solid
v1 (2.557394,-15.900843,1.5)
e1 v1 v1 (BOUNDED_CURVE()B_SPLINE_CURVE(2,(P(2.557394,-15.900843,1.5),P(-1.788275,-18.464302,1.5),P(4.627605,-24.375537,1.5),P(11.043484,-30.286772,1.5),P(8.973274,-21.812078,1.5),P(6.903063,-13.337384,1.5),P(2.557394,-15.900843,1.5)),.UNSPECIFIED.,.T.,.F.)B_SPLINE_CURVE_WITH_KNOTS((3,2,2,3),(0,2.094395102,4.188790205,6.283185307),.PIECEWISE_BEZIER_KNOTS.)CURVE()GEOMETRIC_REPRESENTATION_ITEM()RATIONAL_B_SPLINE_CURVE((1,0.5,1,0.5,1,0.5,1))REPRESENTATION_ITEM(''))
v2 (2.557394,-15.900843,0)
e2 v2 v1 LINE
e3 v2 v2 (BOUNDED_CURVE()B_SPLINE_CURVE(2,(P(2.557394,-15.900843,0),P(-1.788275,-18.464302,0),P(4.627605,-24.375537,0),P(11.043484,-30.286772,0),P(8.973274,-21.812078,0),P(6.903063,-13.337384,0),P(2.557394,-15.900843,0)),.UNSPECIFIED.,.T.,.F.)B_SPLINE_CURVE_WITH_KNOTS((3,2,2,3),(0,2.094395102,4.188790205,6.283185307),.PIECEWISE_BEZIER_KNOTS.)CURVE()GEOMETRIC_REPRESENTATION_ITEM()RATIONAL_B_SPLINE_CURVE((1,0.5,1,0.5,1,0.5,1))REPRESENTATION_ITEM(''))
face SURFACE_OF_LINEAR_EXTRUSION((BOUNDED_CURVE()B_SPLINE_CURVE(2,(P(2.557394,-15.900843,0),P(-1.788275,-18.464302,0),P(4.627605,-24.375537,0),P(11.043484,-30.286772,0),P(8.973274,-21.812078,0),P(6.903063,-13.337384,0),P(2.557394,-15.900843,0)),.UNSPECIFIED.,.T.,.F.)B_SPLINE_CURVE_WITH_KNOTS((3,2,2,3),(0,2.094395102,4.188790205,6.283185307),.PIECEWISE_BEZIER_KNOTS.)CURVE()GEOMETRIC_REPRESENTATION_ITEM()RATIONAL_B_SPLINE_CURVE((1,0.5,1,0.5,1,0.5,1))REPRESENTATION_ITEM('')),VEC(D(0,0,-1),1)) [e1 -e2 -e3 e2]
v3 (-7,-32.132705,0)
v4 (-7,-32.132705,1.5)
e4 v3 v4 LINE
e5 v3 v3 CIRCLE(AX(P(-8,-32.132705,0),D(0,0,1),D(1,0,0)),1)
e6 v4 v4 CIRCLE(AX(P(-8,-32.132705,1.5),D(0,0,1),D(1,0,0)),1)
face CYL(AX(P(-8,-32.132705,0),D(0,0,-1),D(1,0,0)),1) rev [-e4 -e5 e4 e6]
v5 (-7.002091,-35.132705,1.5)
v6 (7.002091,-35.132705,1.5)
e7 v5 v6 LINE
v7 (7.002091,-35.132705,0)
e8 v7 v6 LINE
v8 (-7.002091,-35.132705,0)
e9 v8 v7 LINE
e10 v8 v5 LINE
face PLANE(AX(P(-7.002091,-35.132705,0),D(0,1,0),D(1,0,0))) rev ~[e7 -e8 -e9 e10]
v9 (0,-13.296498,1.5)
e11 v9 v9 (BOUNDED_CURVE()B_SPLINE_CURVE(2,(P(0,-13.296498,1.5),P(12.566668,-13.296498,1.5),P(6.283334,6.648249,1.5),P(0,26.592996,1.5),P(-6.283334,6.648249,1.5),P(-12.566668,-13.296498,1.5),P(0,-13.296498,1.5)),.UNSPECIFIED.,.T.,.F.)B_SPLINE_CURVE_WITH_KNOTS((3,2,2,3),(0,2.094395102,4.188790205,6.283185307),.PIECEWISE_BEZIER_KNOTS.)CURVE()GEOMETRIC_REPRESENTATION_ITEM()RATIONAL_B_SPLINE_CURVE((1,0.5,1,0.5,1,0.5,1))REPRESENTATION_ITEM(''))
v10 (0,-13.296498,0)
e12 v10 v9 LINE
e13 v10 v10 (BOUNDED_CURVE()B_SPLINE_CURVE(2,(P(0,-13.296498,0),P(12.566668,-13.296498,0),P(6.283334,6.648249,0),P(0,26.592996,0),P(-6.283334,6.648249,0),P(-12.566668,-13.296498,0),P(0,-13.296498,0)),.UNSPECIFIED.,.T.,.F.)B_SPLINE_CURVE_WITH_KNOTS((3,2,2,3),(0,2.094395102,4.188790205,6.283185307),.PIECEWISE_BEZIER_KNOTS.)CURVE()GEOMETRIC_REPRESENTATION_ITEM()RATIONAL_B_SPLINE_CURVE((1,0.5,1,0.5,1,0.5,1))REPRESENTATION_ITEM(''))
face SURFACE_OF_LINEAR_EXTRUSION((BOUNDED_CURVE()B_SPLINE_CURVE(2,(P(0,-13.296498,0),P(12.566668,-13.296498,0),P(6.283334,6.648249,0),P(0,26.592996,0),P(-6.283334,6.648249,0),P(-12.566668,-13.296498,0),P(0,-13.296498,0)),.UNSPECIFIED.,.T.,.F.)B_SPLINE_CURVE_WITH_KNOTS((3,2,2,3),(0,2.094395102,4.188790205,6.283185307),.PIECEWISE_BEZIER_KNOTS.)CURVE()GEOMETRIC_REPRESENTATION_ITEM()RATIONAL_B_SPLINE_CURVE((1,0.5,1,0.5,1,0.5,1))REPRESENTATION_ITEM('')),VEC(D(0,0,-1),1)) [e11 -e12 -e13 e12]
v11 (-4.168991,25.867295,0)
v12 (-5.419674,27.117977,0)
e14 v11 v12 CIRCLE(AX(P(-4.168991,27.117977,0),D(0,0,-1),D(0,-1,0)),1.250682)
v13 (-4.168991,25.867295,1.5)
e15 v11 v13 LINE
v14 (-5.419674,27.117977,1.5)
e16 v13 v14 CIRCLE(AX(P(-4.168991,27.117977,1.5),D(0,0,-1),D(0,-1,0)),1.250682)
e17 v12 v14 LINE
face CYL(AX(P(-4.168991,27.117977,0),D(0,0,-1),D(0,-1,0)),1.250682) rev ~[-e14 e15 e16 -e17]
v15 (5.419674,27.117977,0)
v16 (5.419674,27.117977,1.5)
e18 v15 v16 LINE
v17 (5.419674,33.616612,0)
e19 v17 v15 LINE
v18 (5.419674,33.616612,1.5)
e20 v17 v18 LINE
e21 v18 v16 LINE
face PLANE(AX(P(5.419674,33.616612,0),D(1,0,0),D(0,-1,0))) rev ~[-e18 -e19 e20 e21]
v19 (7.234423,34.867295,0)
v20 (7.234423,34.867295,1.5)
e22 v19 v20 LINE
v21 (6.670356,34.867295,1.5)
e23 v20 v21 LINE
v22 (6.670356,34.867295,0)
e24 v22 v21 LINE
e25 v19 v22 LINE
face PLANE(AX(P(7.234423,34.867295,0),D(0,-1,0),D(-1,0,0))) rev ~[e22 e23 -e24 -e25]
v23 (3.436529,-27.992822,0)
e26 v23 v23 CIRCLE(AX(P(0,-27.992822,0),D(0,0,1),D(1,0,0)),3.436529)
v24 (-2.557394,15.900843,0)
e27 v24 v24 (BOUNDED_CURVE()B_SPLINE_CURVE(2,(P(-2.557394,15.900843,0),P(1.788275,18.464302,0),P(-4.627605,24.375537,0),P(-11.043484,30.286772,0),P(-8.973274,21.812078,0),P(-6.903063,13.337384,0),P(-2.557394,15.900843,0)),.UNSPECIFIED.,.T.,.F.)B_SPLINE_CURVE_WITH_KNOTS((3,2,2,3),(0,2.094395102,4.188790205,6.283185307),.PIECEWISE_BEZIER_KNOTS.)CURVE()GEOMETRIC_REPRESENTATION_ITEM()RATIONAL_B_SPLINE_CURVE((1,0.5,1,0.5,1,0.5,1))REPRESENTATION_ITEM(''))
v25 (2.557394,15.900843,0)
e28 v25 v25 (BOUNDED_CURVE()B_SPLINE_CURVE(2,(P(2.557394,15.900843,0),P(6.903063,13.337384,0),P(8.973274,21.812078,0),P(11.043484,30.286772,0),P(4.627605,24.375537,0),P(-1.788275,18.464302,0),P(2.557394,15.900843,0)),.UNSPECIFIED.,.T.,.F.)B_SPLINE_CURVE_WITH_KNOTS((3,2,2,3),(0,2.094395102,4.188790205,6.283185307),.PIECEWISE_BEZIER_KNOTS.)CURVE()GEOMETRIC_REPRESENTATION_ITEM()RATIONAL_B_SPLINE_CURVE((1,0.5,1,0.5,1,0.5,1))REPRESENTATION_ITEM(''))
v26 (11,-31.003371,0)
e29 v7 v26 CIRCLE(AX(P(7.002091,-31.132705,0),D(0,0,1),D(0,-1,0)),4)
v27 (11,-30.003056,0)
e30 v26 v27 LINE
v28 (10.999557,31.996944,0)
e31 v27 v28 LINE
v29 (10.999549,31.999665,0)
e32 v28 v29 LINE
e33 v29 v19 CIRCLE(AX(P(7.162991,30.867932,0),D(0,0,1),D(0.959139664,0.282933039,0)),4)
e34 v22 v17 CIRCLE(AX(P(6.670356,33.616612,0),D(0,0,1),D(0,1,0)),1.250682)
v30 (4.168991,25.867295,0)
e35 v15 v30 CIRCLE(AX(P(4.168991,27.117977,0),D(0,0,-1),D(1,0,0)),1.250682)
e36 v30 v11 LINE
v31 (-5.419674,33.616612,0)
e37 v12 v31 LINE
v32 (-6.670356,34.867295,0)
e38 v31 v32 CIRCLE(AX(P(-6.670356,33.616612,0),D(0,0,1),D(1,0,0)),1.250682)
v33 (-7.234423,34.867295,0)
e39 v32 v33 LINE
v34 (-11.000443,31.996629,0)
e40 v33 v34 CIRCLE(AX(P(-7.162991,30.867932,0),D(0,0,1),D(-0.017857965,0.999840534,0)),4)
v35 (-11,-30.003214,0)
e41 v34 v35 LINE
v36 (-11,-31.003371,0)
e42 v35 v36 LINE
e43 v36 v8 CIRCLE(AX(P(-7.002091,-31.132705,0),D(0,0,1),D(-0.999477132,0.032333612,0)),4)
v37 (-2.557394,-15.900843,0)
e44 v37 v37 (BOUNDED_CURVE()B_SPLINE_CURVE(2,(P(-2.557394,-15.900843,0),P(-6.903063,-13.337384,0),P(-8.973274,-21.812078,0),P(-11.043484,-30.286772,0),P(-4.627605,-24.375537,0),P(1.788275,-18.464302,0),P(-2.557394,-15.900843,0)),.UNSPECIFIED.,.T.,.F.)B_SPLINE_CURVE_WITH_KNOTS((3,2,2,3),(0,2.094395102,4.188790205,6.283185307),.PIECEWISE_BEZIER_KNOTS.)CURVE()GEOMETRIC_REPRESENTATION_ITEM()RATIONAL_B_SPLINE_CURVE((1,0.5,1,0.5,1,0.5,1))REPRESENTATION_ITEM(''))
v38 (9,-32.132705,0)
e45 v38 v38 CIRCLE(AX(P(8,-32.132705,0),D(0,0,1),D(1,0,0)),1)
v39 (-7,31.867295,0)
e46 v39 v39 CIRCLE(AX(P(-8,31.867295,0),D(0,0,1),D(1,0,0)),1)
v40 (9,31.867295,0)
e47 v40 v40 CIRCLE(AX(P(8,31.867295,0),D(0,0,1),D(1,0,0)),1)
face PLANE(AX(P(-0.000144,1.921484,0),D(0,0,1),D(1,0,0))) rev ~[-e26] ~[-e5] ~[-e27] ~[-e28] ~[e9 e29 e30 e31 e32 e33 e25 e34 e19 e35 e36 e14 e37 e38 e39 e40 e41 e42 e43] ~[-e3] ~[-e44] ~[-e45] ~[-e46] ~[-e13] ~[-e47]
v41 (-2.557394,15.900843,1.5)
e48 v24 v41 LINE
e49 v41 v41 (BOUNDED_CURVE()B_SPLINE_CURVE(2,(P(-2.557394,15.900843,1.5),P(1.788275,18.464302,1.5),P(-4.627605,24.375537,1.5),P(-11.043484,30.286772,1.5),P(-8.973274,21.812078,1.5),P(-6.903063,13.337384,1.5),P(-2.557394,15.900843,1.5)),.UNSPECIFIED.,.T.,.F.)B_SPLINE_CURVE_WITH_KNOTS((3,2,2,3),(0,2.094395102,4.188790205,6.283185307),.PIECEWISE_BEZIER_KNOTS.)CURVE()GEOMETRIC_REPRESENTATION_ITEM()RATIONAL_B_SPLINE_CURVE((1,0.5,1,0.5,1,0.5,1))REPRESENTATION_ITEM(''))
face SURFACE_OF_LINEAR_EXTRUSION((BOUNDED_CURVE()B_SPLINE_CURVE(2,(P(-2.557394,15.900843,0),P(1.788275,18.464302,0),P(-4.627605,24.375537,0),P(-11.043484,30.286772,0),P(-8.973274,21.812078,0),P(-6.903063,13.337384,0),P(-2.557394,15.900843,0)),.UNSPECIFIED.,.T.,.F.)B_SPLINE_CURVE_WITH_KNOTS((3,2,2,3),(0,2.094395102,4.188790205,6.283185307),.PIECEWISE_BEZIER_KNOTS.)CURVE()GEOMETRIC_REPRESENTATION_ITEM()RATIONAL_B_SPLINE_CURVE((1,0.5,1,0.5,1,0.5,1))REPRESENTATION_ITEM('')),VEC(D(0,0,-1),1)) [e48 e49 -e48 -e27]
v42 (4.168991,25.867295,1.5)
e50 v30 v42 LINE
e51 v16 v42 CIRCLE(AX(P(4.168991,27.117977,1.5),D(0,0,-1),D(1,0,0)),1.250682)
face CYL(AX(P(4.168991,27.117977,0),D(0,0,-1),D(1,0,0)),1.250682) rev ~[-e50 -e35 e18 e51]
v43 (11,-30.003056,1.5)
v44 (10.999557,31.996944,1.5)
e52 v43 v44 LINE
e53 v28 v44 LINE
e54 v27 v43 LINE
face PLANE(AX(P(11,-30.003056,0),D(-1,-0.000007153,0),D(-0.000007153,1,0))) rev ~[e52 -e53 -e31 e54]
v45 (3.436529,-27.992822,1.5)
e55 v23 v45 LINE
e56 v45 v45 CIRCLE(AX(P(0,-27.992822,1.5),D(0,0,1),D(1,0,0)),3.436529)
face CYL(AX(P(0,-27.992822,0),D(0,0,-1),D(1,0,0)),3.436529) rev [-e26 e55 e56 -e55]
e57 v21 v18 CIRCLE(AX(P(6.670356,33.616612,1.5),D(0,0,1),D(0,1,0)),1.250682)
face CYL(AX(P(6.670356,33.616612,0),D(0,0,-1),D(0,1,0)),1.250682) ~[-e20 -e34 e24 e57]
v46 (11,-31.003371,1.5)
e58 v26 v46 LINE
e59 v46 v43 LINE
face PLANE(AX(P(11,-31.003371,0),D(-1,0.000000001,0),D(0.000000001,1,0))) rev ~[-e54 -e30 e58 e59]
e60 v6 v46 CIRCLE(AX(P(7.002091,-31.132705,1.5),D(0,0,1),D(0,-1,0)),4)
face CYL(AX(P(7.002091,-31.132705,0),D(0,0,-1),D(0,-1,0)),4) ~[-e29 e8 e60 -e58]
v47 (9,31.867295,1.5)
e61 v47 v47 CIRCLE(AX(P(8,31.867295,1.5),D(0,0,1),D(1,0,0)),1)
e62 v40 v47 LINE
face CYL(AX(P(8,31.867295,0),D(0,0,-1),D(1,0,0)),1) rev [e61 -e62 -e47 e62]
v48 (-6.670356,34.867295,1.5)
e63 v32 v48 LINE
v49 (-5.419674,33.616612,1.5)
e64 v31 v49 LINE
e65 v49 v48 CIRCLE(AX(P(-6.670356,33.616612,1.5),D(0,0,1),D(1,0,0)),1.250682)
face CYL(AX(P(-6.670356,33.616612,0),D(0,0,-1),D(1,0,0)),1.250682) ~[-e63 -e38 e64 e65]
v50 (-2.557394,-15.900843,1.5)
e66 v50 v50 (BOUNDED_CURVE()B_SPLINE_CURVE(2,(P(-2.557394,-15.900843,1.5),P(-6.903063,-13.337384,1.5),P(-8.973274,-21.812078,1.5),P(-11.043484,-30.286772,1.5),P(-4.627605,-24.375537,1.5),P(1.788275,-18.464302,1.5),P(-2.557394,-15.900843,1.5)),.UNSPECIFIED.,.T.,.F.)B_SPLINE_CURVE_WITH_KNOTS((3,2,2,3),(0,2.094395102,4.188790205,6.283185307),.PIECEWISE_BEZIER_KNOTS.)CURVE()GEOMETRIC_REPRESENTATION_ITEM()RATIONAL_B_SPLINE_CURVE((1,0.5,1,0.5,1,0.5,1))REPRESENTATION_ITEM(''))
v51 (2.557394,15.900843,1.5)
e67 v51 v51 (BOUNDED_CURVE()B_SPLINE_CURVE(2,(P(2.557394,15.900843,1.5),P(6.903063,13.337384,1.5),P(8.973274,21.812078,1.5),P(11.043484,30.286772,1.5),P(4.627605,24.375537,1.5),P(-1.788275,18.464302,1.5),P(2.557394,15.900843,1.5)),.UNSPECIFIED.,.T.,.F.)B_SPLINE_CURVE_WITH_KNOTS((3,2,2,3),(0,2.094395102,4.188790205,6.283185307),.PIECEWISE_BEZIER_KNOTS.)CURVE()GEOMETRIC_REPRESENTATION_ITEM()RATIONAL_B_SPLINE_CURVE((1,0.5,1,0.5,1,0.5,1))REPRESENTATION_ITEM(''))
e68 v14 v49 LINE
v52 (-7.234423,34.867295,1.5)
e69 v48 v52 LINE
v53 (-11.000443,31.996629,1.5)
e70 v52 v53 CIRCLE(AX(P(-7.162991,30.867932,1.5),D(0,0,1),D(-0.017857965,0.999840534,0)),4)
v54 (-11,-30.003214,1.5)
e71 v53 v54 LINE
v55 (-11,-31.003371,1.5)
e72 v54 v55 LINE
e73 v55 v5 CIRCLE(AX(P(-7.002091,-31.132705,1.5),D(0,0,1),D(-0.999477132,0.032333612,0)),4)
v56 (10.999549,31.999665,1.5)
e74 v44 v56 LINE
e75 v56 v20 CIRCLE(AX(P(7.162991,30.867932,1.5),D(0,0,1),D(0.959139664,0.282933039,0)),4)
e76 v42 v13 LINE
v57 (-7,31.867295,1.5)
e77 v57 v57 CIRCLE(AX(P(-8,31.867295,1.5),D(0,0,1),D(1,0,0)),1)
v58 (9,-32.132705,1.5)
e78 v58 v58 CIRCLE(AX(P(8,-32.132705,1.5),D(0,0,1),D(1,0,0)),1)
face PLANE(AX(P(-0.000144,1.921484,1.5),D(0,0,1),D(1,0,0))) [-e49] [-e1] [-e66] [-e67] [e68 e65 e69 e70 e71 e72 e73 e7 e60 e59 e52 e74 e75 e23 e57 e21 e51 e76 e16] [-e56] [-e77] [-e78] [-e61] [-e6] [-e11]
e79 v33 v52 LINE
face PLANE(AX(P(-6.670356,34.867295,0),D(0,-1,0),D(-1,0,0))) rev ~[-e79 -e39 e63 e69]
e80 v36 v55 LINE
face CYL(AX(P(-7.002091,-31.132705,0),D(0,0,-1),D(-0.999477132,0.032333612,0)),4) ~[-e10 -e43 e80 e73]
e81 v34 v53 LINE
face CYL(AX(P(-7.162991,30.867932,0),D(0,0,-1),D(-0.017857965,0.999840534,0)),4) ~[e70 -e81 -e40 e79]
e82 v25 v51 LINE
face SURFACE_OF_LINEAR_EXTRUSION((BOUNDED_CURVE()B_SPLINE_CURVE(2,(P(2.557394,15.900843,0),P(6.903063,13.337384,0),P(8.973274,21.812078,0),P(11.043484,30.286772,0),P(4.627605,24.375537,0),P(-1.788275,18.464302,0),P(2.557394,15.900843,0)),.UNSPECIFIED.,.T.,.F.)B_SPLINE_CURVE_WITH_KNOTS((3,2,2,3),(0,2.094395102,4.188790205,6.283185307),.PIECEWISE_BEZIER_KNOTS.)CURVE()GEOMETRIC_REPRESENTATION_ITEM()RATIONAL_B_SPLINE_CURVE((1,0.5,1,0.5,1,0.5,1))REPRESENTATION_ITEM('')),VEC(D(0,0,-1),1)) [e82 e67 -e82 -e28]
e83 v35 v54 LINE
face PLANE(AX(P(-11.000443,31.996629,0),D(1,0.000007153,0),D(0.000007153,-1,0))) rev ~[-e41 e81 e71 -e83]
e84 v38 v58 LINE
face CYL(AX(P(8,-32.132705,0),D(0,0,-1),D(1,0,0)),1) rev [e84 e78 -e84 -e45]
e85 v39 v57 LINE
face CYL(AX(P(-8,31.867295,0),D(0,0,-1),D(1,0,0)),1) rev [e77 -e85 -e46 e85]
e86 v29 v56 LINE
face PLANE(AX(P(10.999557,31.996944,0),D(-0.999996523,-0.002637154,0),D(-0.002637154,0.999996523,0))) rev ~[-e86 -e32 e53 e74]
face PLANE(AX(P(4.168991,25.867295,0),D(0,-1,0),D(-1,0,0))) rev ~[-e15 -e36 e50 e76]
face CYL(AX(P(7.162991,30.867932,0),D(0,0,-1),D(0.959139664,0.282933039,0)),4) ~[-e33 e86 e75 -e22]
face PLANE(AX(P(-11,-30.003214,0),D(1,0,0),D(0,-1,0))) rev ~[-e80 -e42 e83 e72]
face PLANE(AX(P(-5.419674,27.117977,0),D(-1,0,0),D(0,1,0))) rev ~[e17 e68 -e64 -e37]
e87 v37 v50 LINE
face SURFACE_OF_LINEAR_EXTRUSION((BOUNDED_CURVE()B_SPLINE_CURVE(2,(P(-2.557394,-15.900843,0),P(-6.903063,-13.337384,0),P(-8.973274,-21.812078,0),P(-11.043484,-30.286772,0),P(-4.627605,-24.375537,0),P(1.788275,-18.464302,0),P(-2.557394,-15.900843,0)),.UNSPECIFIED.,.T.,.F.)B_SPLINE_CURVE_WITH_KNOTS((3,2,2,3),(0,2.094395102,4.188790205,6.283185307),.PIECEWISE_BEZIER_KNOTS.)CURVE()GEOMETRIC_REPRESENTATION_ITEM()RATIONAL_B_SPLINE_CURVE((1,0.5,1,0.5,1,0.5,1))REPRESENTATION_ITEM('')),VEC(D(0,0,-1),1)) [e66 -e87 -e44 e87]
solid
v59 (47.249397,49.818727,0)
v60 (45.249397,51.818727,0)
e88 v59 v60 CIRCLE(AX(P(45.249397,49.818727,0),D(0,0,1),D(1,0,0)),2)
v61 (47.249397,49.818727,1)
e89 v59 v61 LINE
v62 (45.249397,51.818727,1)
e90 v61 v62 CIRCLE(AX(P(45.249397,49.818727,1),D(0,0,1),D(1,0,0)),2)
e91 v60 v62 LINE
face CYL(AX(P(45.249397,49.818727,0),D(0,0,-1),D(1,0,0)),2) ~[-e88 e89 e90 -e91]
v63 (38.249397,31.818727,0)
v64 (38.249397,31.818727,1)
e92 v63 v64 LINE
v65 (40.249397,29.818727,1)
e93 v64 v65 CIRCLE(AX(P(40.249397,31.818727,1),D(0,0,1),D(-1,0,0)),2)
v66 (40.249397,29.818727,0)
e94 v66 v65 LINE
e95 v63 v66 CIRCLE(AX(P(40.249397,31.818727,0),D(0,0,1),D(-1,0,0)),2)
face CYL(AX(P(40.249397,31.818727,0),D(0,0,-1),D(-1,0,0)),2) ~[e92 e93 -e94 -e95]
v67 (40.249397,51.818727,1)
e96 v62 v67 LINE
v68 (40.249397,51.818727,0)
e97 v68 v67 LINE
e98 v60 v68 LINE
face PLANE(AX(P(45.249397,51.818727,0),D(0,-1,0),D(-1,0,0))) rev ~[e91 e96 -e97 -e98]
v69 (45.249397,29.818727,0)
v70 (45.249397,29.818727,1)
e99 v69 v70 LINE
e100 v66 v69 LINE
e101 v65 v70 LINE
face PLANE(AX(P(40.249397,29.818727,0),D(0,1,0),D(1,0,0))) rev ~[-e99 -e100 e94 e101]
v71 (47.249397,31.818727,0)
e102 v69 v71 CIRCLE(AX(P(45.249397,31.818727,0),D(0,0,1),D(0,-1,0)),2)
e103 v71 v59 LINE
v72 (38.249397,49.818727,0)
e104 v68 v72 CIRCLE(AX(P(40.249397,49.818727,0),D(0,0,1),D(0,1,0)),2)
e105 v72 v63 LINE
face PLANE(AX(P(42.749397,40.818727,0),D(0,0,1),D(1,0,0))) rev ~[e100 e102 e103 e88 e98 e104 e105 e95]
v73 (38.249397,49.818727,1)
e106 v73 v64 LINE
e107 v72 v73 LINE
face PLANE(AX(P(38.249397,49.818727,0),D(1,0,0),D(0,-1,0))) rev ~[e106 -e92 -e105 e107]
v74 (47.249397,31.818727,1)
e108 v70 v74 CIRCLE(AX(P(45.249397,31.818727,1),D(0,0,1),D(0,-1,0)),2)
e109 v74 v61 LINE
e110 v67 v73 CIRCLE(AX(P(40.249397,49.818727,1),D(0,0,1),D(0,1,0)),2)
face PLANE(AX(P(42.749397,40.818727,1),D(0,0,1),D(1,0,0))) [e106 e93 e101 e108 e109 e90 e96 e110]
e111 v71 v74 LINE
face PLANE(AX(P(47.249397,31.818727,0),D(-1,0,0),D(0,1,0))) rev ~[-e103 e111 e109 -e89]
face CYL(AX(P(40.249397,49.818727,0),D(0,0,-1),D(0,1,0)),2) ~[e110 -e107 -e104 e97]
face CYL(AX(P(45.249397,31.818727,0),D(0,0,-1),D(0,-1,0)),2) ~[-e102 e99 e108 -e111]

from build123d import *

# Parameters (mm, degrees)
F0_R     = 1
F0_R_2   = 3.4365293236
F1_DEPTH = 1.5
F3_DEPTH = 1


# Not quite as in the source:
# - ends of sketch curves that miss each other by under 0.0002 mm in the source are joined


with BuildPart() as f1:
    # F0 (on Top) → F1 (new body)
    with BuildSketch(Plane.XY):
        with BuildLine():
            Line((-6.6703559288, 34.8672945046), (-7.2344225406, 34.8672945046))
            ThreePointArc((-7.2344225406, 34.8672945046), (-9.5878669678, 34.0491231833), (-11.0004434851, 31.996628953))
            Line((-11.0004434851, 31.996628953), (-10.9999999994, -30.0032136791))
            Line((-10.9999999994, -30.0032136791), (-10.9999999994, -31.003371047))
            ThreePointArc((-10.9999999994, -31.003371047), (-9.8758814594, -33.9150302613), (-7.0020914712, -35.1327054954))
            Line((-7.0020914712, -35.1327054954), (6.8289959157, -35.1327054954))
            Line((6.8289959157, -35.1327054954), (7.0020914712, -35.1327054954))
            ThreePointArc((7.0020914712, -35.1327054954), (9.8758814594, -33.9150302613), (10.9999999994, -31.003371047))
            Line((10.9999999994, -31.003371047), (11, -30.0030563128))
            Line((11, -30.0030563128), (10.9995565132, 31.9969436856))
            Line((10.9995565132, 31.9969436856), (10.9995493379, 31.9996645259))
            ThreePointArc((10.9995493379, 31.9996645259), (9.5866084094, 34.0500821314), (7.2344225406, 34.8672945046))
            Line((7.2344225406, 34.8672945046), (6.6703559288, 34.8672945046))
            ThreePointArc((6.6703559288, 34.8672945046), (5.7859899934, 34.5009781401), (5.4196736289, 33.6166122047))
            Line((5.4196736289, 33.6166122047), (5.4196736289, 28.8547880611))
            Line((5.4196736289, 28.8547880611), (5.4196736289, 27.1179768046))
            ThreePointArc((5.4196736289, 27.1179768046), (5.0533572643, 26.2336108692), (4.1689913289, 25.8672945046))
            Line((4.1689913289, 25.8672945046), (-4.1689913289, 25.8672945046))
            ThreePointArc((-4.1689913289, 25.8672945046), (-5.0533572643, 26.2336108692), (-5.4196736289, 27.1179768046))
            Line((-5.4196736289, 27.1179768046), (-5.4196736289, 28.8547880611))
            Line((-5.4196736289, 28.8547880611), (-5.4196736289, 33.6166122047))
            ThreePointArc((-5.4196736289, 33.6166122047), (-5.7859899934, 34.5009781401), (-6.6703559288, 34.8672945046))
        make_face()
        with Locations((-7.9999999994, -32.1327054954)):
            Circle(F0_R, mode=Mode.SUBTRACT)
        with Locations((0, -27.9928222299)):
            Circle(F0_R_2, mode=Mode.SUBTRACT)
        with BuildLine():
            add(Edge.make_bspline(
                [(-2.5573940948, -15.9008428454), (-6.9030631327, -13.3373837718), (-8.9732737277, -21.8120776777), (-11.0434843227, -30.2867715836), (-4.6276046898, -24.3755367514), (1.7882749432, -18.4643019191), (-2.5573940948, -15.9008428454)],
                knots=[0, 0, 0, 2.0943951024, 2.0943951024, 4.1887902048, 4.1887902048, 6.2831853072, 6.2831853072, 6.2831853072], degree=2, weights=[1, 0.5, 1, 0.5, 1, 0.5, 1]))
        make_face(mode=Mode.SUBTRACT)
        with BuildLine():
            add(Edge.make_bspline(
                [(2.5573940948, -15.9008428454), (-1.7882749432, -18.4643019191), (4.6276046898, -24.3755367514), (11.0434843227, -30.2867715836), (8.9732737277, -21.8120776777), (6.9030631327, -13.3373837718), (2.5573940948, -15.9008428454)],
                knots=[0, 0, 0, 2.0943951024, 2.0943951024, 4.1887902048, 4.1887902048, 6.2831853072, 6.2831853072, 6.2831853072], degree=2, weights=[1, 0.5, 1, 0.5, 1, 0.5, 1]))
        make_face(mode=Mode.SUBTRACT)
        with Locations((8, -32.1327054954)):
            Circle(F0_R, mode=Mode.SUBTRACT)
        with BuildLine():
            add(Edge.make_bspline(
                [(0, -13.2964979857), (12.5666675431, -13.2964979857), (6.2833337715, 6.6482489929), (0, 26.5929959714), (-6.2833337715, 6.6482489929), (-12.5666675431, -13.2964979857), (0, -13.2964979857)],
                knots=[0, 0, 0, 2.0943951024, 2.0943951024, 4.1887902048, 4.1887902048, 6.2831853072, 6.2831853072, 6.2831853072], degree=2, weights=[1, 0.5, 1, 0.5, 1, 0.5, 1]))
        make_face(mode=Mode.SUBTRACT)
        with Locations((-8, 31.8672945046)):
            Circle(F0_R, mode=Mode.SUBTRACT)
        with BuildLine():
            add(Edge.make_bspline(
                [(-2.5573940948, 15.9008428454), (1.7882749432, 18.4643019191), (-4.6276046898, 24.3755367514), (-11.0434843227, 30.2867715836), (-8.9732737277, 21.8120776777), (-6.9030631327, 13.3373837718), (-2.5573940948, 15.9008428454)],
                knots=[0, 0, 0, 2.0943951024, 2.0943951024, 4.1887902048, 4.1887902048, 6.2831853072, 6.2831853072, 6.2831853072], degree=2, weights=[1, 0.5, 1, 0.5, 1, 0.5, 1]))
        make_face(mode=Mode.SUBTRACT)
        with BuildLine():
            add(Edge.make_bspline(
                [(2.5573940948, 15.9008428454), (6.9030631327, 13.3373837718), (8.9732737277, 21.8120776777), (11.0434843227, 30.2867715836), (4.6276046898, 24.3755367514), (-1.7882749432, 18.4643019191), (2.5573940948, 15.9008428454)],
                knots=[0, 0, 0, 2.0943951024, 2.0943951024, 4.1887902048, 4.1887902048, 6.2831853072, 6.2831853072, 6.2831853072], degree=2, weights=[1, 0.5, 1, 0.5, 1, 0.5, 1]))
        make_face(mode=Mode.SUBTRACT)
        with Locations((8, 31.8672945046)):
            Circle(F0_R, mode=Mode.SUBTRACT)
    extrude(amount=F1_DEPTH)


with BuildPart() as f3:
    # F2 (on Top) → F3 (new body)
    with BuildSketch(Plane.XY):
        with BuildLine():
            Line((45.2493974566, 51.8187274049), (40.2493974566, 51.8187274049))
            ThreePointArc((40.2493974566, 51.8187274049), (38.8351838943, 51.2329409672), (38.2493974566, 49.8187274049))
            Line((38.2493974566, 49.8187274049), (38.2493974566, 31.8187274049))
            ThreePointArc((38.2493974566, 31.8187274049), (38.8351838943, 30.4045138425), (40.2493974566, 29.8187274049))
            Line((40.2493974566, 29.8187274049), (45.2493974566, 29.8187274049))
            ThreePointArc((45.2493974566, 29.8187274049), (46.663611019, 30.4045138425), (47.2493974566, 31.8187274049))
            Line((47.2493974566, 31.8187274049), (47.2493974566, 49.8187274049))
            ThreePointArc((47.2493974566, 49.8187274049), (46.663611019, 51.2329409672), (45.2493974566, 51.8187274049))
        make_face()
    extrude(amount=F3_DEPTH)


solid = Compound([f1.part, f3.part])
